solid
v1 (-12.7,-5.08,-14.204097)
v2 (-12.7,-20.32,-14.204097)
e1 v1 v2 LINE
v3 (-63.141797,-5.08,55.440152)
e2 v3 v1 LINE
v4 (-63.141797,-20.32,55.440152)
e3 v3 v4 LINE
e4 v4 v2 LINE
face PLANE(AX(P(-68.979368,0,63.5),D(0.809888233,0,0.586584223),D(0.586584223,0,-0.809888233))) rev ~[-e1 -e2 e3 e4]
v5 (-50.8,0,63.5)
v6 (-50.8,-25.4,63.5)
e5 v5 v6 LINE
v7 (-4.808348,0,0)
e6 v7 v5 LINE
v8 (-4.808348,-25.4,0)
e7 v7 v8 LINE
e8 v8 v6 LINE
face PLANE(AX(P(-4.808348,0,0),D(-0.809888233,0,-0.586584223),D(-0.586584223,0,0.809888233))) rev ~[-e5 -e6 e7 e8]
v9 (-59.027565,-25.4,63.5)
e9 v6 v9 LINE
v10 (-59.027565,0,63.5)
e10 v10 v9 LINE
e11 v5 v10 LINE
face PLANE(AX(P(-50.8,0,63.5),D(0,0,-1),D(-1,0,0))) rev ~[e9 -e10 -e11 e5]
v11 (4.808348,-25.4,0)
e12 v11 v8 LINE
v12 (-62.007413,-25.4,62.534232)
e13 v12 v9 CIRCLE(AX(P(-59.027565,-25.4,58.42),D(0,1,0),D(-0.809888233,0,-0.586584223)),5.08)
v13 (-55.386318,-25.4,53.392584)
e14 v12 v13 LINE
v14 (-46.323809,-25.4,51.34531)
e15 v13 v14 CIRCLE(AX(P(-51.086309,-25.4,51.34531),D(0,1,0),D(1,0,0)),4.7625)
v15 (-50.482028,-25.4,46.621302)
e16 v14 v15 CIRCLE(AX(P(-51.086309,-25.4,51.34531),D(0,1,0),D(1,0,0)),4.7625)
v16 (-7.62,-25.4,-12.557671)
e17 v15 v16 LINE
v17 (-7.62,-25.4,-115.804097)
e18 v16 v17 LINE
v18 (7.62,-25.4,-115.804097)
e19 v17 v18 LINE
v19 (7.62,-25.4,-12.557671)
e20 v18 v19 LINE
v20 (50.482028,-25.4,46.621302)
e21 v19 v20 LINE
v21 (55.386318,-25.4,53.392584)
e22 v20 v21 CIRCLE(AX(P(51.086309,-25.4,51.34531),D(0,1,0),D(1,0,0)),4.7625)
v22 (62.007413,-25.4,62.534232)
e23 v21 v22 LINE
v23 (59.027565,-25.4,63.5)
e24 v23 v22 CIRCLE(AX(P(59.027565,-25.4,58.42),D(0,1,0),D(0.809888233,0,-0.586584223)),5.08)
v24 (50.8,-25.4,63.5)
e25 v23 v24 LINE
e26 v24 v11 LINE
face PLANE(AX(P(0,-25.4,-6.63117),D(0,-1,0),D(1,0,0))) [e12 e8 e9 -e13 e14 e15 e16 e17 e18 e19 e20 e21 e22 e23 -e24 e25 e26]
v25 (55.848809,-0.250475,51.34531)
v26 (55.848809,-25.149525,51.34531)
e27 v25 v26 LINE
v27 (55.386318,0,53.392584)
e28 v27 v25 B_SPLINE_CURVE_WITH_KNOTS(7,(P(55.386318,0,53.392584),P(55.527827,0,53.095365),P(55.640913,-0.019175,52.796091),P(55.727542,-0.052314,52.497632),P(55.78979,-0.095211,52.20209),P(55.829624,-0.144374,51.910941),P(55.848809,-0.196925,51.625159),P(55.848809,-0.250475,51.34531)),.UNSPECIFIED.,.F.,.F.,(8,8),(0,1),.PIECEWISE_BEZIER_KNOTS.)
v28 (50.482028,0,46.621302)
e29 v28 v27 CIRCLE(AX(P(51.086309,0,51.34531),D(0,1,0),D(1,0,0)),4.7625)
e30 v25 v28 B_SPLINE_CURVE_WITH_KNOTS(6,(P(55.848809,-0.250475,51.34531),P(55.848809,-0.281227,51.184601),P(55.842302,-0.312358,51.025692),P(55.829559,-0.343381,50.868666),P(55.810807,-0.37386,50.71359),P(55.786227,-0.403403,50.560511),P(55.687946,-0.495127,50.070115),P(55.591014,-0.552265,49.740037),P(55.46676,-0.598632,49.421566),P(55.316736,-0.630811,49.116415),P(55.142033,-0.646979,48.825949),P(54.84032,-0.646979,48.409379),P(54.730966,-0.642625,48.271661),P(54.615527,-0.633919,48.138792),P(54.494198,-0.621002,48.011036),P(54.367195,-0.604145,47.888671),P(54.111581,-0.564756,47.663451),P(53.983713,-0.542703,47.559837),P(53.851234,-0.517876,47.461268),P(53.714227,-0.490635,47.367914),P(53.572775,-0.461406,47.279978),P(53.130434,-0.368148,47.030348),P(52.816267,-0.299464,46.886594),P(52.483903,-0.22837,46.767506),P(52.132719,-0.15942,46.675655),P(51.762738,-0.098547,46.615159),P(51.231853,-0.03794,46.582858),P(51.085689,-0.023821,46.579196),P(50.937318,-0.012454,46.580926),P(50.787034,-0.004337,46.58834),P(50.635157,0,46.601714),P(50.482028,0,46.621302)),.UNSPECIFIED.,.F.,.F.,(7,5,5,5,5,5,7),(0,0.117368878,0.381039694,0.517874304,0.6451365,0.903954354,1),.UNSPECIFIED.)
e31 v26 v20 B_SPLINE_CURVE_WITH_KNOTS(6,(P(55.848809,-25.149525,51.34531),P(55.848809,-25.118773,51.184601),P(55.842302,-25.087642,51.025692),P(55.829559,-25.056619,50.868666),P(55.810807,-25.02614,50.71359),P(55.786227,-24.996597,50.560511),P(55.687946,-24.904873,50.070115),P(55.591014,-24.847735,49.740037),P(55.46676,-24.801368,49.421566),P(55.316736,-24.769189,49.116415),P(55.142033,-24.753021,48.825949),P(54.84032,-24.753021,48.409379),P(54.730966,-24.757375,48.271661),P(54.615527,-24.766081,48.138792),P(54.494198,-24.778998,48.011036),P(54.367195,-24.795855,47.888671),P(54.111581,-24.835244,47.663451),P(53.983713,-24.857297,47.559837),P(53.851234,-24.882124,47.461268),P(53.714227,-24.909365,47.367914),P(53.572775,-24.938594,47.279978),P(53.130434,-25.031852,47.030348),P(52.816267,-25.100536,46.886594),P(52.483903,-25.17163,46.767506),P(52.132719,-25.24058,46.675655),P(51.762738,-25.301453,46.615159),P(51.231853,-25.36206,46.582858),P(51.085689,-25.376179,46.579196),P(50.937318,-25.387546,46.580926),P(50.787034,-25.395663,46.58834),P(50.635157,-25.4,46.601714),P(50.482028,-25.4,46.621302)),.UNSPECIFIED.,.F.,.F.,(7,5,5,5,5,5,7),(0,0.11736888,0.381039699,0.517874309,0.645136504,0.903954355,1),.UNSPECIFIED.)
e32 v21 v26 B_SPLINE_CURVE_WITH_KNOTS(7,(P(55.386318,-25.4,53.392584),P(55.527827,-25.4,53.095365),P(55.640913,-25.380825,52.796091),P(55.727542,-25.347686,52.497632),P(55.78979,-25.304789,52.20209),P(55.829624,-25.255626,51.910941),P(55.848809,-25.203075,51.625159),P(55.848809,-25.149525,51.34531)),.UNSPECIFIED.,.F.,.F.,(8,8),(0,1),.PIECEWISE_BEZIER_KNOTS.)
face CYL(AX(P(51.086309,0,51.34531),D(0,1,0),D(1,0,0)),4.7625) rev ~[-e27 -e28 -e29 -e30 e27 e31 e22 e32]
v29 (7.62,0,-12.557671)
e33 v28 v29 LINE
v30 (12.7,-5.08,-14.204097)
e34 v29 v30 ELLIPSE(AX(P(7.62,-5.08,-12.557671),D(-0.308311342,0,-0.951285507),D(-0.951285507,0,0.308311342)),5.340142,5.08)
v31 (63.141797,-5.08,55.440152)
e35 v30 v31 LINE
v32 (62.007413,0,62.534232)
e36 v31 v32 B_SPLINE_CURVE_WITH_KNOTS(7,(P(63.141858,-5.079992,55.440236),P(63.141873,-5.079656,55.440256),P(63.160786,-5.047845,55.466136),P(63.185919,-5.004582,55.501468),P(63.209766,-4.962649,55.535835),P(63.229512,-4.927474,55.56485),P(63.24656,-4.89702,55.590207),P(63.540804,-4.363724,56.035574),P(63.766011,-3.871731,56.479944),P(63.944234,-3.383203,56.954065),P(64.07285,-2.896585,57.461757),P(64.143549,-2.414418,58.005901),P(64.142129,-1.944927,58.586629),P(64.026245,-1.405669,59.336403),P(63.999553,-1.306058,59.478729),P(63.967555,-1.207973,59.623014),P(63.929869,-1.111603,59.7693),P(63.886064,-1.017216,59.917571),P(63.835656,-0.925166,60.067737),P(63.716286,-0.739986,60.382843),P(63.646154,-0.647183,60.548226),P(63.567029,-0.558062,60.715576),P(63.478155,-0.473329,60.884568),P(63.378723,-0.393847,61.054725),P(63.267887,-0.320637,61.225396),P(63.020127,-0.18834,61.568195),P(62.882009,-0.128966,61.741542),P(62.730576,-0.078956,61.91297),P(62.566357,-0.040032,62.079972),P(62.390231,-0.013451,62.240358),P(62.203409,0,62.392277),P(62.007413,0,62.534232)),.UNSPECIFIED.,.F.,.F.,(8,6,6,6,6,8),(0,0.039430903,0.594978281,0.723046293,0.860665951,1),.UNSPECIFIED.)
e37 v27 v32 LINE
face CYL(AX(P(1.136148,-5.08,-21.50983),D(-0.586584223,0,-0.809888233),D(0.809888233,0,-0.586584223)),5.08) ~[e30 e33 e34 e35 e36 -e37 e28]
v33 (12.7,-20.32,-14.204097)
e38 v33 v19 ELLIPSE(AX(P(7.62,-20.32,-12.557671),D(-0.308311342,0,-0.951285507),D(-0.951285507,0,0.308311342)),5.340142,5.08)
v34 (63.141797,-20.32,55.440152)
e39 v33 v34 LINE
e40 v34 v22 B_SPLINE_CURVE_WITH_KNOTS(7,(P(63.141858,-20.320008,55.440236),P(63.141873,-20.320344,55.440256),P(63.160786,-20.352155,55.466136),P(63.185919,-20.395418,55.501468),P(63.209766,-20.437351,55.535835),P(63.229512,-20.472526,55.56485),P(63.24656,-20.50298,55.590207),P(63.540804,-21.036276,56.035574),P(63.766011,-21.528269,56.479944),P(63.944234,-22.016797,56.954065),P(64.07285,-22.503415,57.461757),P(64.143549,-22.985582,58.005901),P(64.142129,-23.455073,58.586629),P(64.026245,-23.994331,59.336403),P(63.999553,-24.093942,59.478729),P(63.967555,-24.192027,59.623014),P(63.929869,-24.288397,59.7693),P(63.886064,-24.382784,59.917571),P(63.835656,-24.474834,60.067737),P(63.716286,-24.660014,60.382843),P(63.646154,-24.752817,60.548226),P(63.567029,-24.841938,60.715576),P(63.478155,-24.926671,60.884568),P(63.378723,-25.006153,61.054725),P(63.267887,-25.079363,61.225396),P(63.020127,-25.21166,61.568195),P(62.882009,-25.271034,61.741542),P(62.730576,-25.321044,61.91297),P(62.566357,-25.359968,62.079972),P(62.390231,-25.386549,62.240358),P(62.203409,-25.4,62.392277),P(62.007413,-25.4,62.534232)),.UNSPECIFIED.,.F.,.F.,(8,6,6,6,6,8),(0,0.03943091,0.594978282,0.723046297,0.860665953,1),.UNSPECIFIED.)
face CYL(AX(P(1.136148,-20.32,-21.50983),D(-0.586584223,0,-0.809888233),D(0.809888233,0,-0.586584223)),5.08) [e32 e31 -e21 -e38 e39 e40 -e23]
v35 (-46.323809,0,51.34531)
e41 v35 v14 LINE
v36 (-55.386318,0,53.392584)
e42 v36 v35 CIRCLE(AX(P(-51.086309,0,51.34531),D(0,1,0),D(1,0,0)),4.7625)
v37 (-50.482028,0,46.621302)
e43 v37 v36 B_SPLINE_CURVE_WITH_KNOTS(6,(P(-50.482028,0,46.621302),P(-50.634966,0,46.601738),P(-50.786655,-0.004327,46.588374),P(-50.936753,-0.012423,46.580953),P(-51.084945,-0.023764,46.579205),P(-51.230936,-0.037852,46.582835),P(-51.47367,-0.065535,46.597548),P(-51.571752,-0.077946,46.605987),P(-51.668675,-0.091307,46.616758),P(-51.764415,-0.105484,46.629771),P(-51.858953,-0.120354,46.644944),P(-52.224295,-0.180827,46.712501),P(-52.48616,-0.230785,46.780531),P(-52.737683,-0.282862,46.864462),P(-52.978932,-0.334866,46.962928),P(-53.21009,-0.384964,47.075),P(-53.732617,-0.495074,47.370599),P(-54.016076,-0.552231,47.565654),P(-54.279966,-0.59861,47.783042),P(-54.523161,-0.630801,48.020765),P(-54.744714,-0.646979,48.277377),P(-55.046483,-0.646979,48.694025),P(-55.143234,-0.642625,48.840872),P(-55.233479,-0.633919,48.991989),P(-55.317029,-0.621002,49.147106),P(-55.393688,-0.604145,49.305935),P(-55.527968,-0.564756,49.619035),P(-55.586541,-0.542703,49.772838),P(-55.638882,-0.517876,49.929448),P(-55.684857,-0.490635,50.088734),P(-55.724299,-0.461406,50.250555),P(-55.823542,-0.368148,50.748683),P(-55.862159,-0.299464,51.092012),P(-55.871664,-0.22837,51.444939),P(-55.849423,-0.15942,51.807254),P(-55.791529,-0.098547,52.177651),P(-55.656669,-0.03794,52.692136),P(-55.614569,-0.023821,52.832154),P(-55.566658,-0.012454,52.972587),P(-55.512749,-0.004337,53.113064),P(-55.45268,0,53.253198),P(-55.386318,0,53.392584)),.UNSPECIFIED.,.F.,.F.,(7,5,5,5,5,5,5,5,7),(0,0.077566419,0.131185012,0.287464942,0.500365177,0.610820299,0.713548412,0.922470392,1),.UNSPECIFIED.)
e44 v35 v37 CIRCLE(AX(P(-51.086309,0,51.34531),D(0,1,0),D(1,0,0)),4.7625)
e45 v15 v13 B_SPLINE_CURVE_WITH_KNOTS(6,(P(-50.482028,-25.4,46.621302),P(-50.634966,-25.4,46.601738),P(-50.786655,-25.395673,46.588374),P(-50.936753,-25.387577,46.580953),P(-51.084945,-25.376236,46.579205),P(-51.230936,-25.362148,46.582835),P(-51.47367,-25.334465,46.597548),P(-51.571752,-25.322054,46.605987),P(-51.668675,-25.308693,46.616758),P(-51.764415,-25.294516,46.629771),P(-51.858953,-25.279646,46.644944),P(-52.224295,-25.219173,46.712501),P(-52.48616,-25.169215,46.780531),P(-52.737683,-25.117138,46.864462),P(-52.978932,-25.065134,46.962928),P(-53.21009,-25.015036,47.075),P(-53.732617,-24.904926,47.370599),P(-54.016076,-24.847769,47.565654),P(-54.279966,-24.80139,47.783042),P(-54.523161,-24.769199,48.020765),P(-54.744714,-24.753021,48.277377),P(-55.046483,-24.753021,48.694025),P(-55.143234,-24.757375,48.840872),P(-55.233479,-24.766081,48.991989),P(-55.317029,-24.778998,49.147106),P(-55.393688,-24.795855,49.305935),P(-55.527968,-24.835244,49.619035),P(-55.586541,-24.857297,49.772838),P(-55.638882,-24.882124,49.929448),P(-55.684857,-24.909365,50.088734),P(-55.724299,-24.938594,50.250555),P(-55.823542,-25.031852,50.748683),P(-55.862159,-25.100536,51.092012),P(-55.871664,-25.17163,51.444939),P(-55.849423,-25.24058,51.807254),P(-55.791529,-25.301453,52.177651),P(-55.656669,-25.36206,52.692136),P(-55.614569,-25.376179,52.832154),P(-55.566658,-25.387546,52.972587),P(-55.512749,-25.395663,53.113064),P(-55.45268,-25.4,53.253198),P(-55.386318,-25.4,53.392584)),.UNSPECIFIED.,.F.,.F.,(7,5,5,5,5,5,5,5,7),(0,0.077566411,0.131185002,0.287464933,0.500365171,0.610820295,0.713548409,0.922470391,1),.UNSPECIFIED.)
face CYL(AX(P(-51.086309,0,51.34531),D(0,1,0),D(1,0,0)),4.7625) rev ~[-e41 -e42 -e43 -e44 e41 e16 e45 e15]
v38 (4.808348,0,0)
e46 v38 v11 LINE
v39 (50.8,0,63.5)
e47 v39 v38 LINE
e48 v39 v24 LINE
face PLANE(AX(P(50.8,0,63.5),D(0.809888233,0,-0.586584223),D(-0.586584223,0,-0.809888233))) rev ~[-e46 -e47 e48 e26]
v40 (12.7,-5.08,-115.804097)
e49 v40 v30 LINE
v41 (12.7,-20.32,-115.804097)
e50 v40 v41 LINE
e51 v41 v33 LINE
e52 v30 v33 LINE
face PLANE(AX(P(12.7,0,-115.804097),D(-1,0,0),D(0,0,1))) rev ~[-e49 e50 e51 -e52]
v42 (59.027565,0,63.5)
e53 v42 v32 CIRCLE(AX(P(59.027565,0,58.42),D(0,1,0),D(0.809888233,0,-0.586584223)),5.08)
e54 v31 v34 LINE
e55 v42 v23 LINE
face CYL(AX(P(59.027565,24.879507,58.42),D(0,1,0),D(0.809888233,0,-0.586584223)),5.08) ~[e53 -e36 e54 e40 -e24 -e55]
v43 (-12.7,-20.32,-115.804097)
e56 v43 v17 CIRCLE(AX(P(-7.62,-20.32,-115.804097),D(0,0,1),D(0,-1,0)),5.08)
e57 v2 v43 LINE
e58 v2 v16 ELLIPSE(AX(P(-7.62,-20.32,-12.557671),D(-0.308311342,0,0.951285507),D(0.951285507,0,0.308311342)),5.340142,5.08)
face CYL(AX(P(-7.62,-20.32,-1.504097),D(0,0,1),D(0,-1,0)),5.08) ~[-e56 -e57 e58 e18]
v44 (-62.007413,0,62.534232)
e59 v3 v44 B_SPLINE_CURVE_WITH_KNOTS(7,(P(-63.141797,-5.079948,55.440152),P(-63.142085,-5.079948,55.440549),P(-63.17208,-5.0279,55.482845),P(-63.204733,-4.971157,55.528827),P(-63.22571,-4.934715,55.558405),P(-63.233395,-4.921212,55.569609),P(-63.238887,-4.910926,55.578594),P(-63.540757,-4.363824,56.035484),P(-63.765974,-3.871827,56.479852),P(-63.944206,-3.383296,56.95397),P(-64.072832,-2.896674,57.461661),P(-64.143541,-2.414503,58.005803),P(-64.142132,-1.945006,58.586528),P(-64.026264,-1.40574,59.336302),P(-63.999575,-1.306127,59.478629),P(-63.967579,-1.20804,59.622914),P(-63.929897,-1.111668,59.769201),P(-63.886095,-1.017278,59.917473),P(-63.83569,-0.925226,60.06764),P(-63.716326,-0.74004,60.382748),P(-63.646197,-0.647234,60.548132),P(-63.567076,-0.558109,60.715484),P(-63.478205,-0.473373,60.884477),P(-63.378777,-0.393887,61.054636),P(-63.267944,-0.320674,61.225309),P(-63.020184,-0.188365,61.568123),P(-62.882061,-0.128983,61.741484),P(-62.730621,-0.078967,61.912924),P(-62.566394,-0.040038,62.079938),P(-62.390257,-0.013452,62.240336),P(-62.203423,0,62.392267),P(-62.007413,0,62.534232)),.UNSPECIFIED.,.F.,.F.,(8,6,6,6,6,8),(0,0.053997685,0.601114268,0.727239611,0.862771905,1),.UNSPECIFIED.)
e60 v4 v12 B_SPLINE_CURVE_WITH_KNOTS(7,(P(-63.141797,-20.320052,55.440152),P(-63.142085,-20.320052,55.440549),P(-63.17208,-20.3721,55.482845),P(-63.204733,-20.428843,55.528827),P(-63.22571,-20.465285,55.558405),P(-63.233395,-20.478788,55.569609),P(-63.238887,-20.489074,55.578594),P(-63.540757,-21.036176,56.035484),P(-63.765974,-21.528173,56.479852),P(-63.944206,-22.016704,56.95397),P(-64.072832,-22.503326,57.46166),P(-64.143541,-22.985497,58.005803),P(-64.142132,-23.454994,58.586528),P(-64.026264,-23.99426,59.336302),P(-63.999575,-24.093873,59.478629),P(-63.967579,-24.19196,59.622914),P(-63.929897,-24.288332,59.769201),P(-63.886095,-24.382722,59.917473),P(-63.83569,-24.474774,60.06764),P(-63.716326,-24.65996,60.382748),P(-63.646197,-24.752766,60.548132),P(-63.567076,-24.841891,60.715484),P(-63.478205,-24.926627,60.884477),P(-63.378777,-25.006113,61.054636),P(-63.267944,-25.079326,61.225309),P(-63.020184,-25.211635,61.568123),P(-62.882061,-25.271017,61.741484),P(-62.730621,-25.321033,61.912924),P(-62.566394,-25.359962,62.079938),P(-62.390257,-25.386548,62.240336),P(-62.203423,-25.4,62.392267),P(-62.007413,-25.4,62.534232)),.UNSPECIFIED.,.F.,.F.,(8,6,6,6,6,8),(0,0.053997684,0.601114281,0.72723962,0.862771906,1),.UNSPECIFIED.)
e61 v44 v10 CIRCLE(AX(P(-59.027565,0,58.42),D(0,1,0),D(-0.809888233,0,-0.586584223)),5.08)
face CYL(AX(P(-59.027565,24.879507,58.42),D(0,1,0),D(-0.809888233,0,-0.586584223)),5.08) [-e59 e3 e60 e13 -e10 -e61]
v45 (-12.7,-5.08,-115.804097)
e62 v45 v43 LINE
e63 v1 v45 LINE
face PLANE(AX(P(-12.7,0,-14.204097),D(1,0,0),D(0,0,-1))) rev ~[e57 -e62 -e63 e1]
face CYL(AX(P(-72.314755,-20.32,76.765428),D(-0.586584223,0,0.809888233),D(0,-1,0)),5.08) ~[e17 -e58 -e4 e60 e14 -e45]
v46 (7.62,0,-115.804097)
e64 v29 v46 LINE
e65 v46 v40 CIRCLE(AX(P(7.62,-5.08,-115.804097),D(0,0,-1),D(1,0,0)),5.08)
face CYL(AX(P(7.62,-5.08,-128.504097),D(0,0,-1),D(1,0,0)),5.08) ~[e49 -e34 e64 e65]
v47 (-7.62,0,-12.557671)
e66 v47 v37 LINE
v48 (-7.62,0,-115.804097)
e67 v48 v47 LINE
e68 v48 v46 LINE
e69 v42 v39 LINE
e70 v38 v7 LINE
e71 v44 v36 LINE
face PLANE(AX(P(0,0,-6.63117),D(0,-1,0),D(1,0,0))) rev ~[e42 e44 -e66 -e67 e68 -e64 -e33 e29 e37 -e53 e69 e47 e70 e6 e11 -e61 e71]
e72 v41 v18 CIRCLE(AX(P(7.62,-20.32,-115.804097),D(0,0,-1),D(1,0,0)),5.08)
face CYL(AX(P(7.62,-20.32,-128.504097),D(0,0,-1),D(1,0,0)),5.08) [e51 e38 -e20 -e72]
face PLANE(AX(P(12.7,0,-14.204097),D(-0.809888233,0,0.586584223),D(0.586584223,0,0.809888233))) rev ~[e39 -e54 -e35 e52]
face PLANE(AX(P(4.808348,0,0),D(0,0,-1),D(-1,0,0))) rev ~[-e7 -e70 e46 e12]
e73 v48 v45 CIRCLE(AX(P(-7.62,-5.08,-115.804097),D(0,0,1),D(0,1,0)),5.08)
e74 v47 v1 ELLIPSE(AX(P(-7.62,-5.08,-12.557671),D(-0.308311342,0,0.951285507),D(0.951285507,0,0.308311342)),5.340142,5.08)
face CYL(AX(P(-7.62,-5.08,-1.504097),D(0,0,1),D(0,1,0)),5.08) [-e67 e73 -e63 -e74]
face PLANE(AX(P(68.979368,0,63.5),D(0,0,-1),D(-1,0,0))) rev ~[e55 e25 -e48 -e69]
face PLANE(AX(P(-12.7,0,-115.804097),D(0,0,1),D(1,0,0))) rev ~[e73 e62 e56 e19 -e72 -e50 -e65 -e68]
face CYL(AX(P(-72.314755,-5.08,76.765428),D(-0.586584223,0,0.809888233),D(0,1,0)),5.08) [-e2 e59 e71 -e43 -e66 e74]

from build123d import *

# Parameters (mm, degrees)
F1_DEPTH     = 25.4
F3_DEPTH     = 25.401
F4_T1_DEPTH  = 75.1590131963
F4_T6_DEPTH  = 127
F4_T11_DEPTH = 127
F4_T16_DEPTH = 127
F4_T21_DEPTH = 127
F4_T26_DEPTH = 121.344223221
F4_T31_DEPTH = 121.344223221
F4_T36_DEPTH = 121.344223221
F4_T41_DEPTH = 121.344223221
F4_T47_DEPTH = 121.344223221
F4_T51_DEPTH = 127
F4_T58_DEPTH = 127
F4_T62_DEPTH = 121.344223221
F4_T69_DEPTH = 121.344223221
F4_T73_DEPTH = 127
F4_T80_DEPTH = 127
F4_T84_DEPTH = 121.344223221


# Not quite as in the source:
# - a fillet or chamfer that OpenCascade refuses, or shapes differently, is made with other operations: its cross-section is extruded or revolved along the edge and cut away or added


with BuildPart() as f1:
    # F0 (on Front) → F1 (new body)
    with BuildSketch(Plane.XZ):
        Polygon((4.8083475167, 0), (0, 0), (-4.8083475167, 0), (-50.8, 63.5), (-68.9793676138, 63.5), (-12.7, -14.2040973853), (-12.7, -115.8040973853), (0, -115.8040973853), (12.7, -115.8040973853), (12.7, -14.2040973853), (68.9793676138, 63.5), (50.8, 63.5), align=None)
    extrude(amount=F1_DEPTH)

    # F2 (on face) → F3 (cut, through all)
    with BuildSketch(Plane(origin=(0, 0, 0), x_dir=(-1, 0, 0), z_dir=(0, 1, 0))):
        with BuildLine():
            ThreePointArc((-46.3238090676, 51.3453096211), (-51.0863090676, 56.1078096211), (-55.8488090676, 51.3453096211))
            Line((-55.8488090676, 51.3453096211), (-46.3238090676, 51.3453096211))
        make_face()
        with BuildLine():
            Line((-46.3238090676, 51.3453096211), (-55.8488090676, 51.3453096211))
            ThreePointArc((-55.8488090676, 51.3453096211), (-51.0863090676, 46.5828096211), (-46.3238090676, 51.3453096211))
        make_face()
        with BuildLine():
            ThreePointArc((55.8488090676, 51.3453096211), (51.0863090676, 56.1078096211), (46.3238090676, 51.3453096211))
            Line((46.3238090676, 51.3453096211), (55.8488090676, 51.3453096211))
        make_face()
        with BuildLine():
            Line((55.8488090676, 51.3453096211), (46.3238090676, 51.3453096211))
            ThreePointArc((46.3238090676, 51.3453096211), (51.0863090676, 46.5828096211), (55.8488090676, 51.3453096211))
        make_face()
    extrude(amount=-F3_DEPTH, mode=Mode.SUBTRACT)

    # F4: fillet of radius 5.08 on 10 edges, made by hand

    # F4_s2 → F4_t1 (cut)
    with BuildSketch(Plane.XZ.offset(-24.8795065982)):
        with BuildLine():
            ThreePointArc((-63.1417971968, 55.440152148), (-63.552165901, 60.7296290732), (-59.0275649745, 63.5))
            Line((-59.0275649745, 63.5), (-68.9793676138, 63.5))
            Line((-68.9793676138, 63.5), (-63.1417971968, 55.440152148))
        make_face()
        with BuildLine():
            ThreePointArc((63.1417971968, 55.440152148), (63.552165901, 60.7296290732), (59.0275649745, 63.5))
            Line((59.0275649745, 63.5), (68.9793676138, 63.5))
            Line((68.9793676138, 63.5), (63.1417971968, 55.440152148))
        make_face()
    extrude(amount=F4_T1_DEPTH, mode=Mode.SUBTRACT)


with BuildPart() as f4_tool4:
    # F4_s5 → F4_t6 (new body)
    with BuildSketch(Plane.XY.offset(-128.5040973853)):
        with BuildLine():
            ThreePointArc((12.7, -5.08), (11.2121024484, -1.4878975516), (7.62, 0))
            Line((7.62, 0), (12.7, 0))
            Line((12.7, 0), (12.7, -5.08))
        make_face()
    extrude(amount=F4_T6_DEPTH)

    split(bisect_by=Plane(origin=(15.0780779602, 0, -10.9207200262), x_dir=(0, 1, 0), z_dir=(0.8098882327, 0, -0.5865842228)), keep=Keep.TOP)


with BuildPart() as f1_1:
    add(f1.part)

    # F4_t3: cut F4_tool4
    add(f4_tool4.part, mode=Mode.SUBTRACT)


with BuildPart() as f4_tool9:
    # F4_s10 → F4_t11 (new body)
    with BuildSketch(Plane.XY.offset(-1.5040973853)):
        with BuildLine():
            ThreePointArc((-7.62, 0), (-11.2121024484, -1.4878975516), (-12.7, -5.08))
            Line((-12.7, -5.08), (-12.7, 0))
            Line((-12.7, 0), (-7.62, 0))
        make_face()
    extrude(amount=-F4_T11_DEPTH)

    split(bisect_by=Plane(origin=(-15.0780779602, 0, -10.9207200262), x_dir=(0, 1, 0), z_dir=(-0.8098882327, 0, -0.5865842228)), keep=Keep.TOP)


with BuildPart() as f1_2:
    add(f1_1.part)

    # F4_t8: cut F4_tool9
    add(f4_tool9.part, mode=Mode.SUBTRACT)


with BuildPart() as f4_tool14:
    # F4_s15 → F4_t16 (new body)
    with BuildSketch(Plane.XY.offset(-128.5040973853)):
        with BuildLine():
            ThreePointArc((12.7, -20.32), (11.2121024484, -23.9121024484), (7.62, -25.4))
            Line((7.62, -25.4), (12.7, -25.4))
            Line((12.7, -25.4), (12.7, -20.32))
        make_face()
    extrude(amount=F4_T16_DEPTH)

    split(bisect_by=Plane(origin=(15.0780779602, 0, -10.9207200262), x_dir=(0, 1, 0), z_dir=(0.8098882327, 0, -0.5865842228)), keep=Keep.TOP)


with BuildPart() as f1_3:
    add(f1_2.part)

    # F4_t13: cut F4_tool14
    add(f4_tool14.part, mode=Mode.SUBTRACT)


with BuildPart() as f4_tool19:
    # F4_s20 → F4_t21 (new body)
    with BuildSketch(Plane.XY.offset(-1.5040973853)):
        with BuildLine():
            ThreePointArc((-7.62, -25.4), (-11.2121024484, -23.9121024484), (-12.7, -20.32))
            Line((-12.7, -20.32), (-12.7, -25.4))
            Line((-12.7, -25.4), (-7.62, -25.4))
        make_face()
    extrude(amount=-F4_T21_DEPTH)

    split(bisect_by=Plane(origin=(-15.0780779602, 0, -10.9207200262), x_dir=(0, 1, 0), z_dir=(-0.8098882327, 0, -0.5865842228)), keep=Keep.TOP)


with BuildPart() as f1_4:
    add(f1_3.part)

    # F4_t18: cut F4_tool19
    add(f4_tool19.part, mode=Mode.SUBTRACT)


with BuildPart() as f4_tool24:
    # F4_s25 → F4_t26 (new body)
    with BuildSketch(Plane(origin=(-9.8276975902, 0, -13.5689579148), x_dir=(0, 1, 0), z_dir=(0.5865842228, 0, 0.8098882327))):
        with BuildLine():
            ThreePointArc((-20.32, -18.6174799816), (-23.9121024484, -17.12958243), (-25.4, -13.5374799816))
            Line((-25.4, -13.5374799816), (-25.4, -18.6174799816))
            Line((-25.4, -18.6174799816), (-20.32, -18.6174799816))
        make_face()
    extrude(amount=F4_T26_DEPTH)

    split(bisect_by=Plane.YZ.offset(12.7), keep=Keep.TOP)


with BuildPart() as f1_5:
    add(f1_4.part)

    # F4_t23: cut F4_tool24
    add(f4_tool24.part, mode=Mode.SUBTRACT)


with BuildPart() as f4_tool29:
    # F4_s30 → F4_t31 (new body)
    with BuildSketch(Plane(origin=(-9.8276975902, 0, -13.5689579148), x_dir=(0, 1, 0), z_dir=(0.5865842228, 0, 0.8098882327))):
        with BuildLine():
            ThreePointArc((-5.08, -18.6174799816), (-1.4878975516, -17.12958243), (0, -13.5374799816))
            Line((0, -13.5374799816), (0, -18.6174799816))
            Line((0, -18.6174799816), (-5.08, -18.6174799816))
        make_face()
    extrude(amount=F4_T31_DEPTH)

    split(bisect_by=Plane.YZ.offset(12.7), keep=Keep.TOP)


with BuildPart() as f1_6:
    add(f1_5.part)

    # F4_t28: cut F4_tool29
    add(f4_tool29.part, mode=Mode.SUBTRACT)


with BuildPart() as f4_tool34:
    # F4_s35 → F4_t36 (new body)
    with BuildSketch(Plane(origin=(-61.3509092836, 0, 84.7063005819), x_dir=(0, 1, 0), z_dir=(0.5865842228, 0, -0.8098882327))):
        with BuildLine():
            ThreePointArc((-25.4, -13.5374799816), (-23.9121024484, -17.12958243), (-20.32, -18.6174799816))
            Line((-20.32, -18.6174799816), (-25.4, -18.6174799816))
            Line((-25.4, -18.6174799816), (-25.4, -13.5374799816))
        make_face()
    extrude(amount=F4_T36_DEPTH)

    split(bisect_by=Plane.YZ.offset(-12.7), keep=Keep.BOTTOM)


with BuildPart() as f1_7:
    add(f1_6.part)

    # F4_t33: cut F4_tool34
    add(f4_tool34.part, mode=Mode.SUBTRACT)


with BuildPart() as f4_tool39:
    # F4_s40 → F4_t41 (new body)
    with BuildSketch(Plane(origin=(-61.3509092836, 0, 84.7063005819), x_dir=(0, 1, 0), z_dir=(0.5865842228, 0, -0.8098882327))):
        with BuildLine():
            ThreePointArc((0, -13.5374799816), (-1.4878975516, -17.12958243), (-5.08, -18.6174799816))
            Line((-5.08, -18.6174799816), (0, -18.6174799816))
            Line((0, -18.6174799816), (0, -13.5374799816))
        make_face()
    extrude(amount=F4_T41_DEPTH)

    split(bisect_by=Plane.YZ.offset(-12.7), keep=Keep.BOTTOM)


with BuildPart() as f1_8:
    add(f1_7.part)

    # F4_t38: cut F4_tool39
    add(f4_tool39.part, mode=Mode.SUBTRACT)


with BuildPart() as f4_tool45:
    # F4_s46 → F4_t47 (new body)
    with BuildSketch(Plane(origin=(-9.8276975902, 0, -13.5689579148), x_dir=(0, 1, 0), z_dir=(0.5865842228, 0, 0.8098882327))):
        with BuildLine():
            ThreePointArc((-5.08, -18.6174799816), (-1.4878975516, -17.12958243), (0, -13.5374799816))
            Line((0, -13.5374799816), (0, -18.6174799816))
            Line((0, -18.6174799816), (-5.08, -18.6174799816))
        make_face()
    extrude(amount=F4_T47_DEPTH)

    split(bisect_by=Plane.YZ.offset(12.7), keep=Keep.BOTTOM)


with BuildPart() as f4_tool49:
    # F4_s50 → F4_t51 (new body)
    with BuildSketch(Plane.XY.offset(-128.5040973853)):
        with BuildLine():
            ThreePointArc((12.7, -5.08), (11.2121024484, -1.4878975516), (7.62, 0))
            Line((7.62, 0), (12.7, 0))
            Line((12.7, 0), (12.7, -5.08))
        make_face()
    extrude(amount=F4_T51_DEPTH)

    split(bisect_by=Plane(origin=(15.0780779602, 0, -10.9207200262), x_dir=(0, 1, 0), z_dir=(-0.8098882327, 0, 0.5865842228)), keep=Keep.TOP)


with BuildPart() as f4_tool45_1:
    add(f4_tool45.part)

    # F4_t53: intersect F4_tool49
    add(f4_tool49.part, mode=Mode.INTERSECT)


with BuildPart() as f1_9:
    add(f1_8.part)

    # F4_t43: cut F4_tool45
    add(f4_tool45_1.part, mode=Mode.SUBTRACT)


with BuildPart() as f4_tool56:
    # F4_s57 → F4_t58 (new body)
    with BuildSketch(Plane.XY.offset(-1.5040973853)):
        with BuildLine():
            ThreePointArc((-7.62, 0), (-11.2121024484, -1.4878975516), (-12.7, -5.08))
            Line((-12.7, -5.08), (-12.7, 0))
            Line((-12.7, 0), (-7.62, 0))
        make_face()
    extrude(amount=-F4_T58_DEPTH)

    split(bisect_by=Plane(origin=(-15.0780779602, 0, -10.9207200262), x_dir=(0, 1, 0), z_dir=(0.8098882327, 0, 0.5865842228)), keep=Keep.TOP)


with BuildPart() as f4_tool60:
    # F4_s61 → F4_t62 (new body)
    with BuildSketch(Plane(origin=(-61.3509092836, 0, 84.7063005819), x_dir=(0, 1, 0), z_dir=(0.5865842228, 0, -0.8098882327))):
        with BuildLine():
            ThreePointArc((0, -13.5374799816), (-1.4878975516, -17.12958243), (-5.08, -18.6174799816))
            Line((-5.08, -18.6174799816), (0, -18.6174799816))
            Line((0, -18.6174799816), (0, -13.5374799816))
        make_face()
    extrude(amount=F4_T62_DEPTH)

    split(bisect_by=Plane.YZ.offset(-12.7), keep=Keep.TOP)


with BuildPart() as f4_tool56_1:
    add(f4_tool56.part)

    # F4_t64: intersect F4_tool60
    add(f4_tool60.part, mode=Mode.INTERSECT)


with BuildPart() as f1_10:
    add(f1_9.part)

    # F4_t54: cut F4_tool56
    add(f4_tool56_1.part, mode=Mode.SUBTRACT)


with BuildPart() as f4_tool67:
    # F4_s68 → F4_t69 (new body)
    with BuildSketch(Plane(origin=(-9.8276975902, 0, -13.5689579148), x_dir=(0, 1, 0), z_dir=(0.5865842228, 0, 0.8098882327))):
        with BuildLine():
            ThreePointArc((-20.32, -18.6174799816), (-23.9121024484, -17.12958243), (-25.4, -13.5374799816))
            Line((-25.4, -13.5374799816), (-25.4, -18.6174799816))
            Line((-25.4, -18.6174799816), (-20.32, -18.6174799816))
        make_face()
    extrude(amount=F4_T69_DEPTH)

    split(bisect_by=Plane.YZ.offset(12.7), keep=Keep.BOTTOM)


with BuildPart() as f4_tool71:
    # F4_s72 → F4_t73 (new body)
    with BuildSketch(Plane.XY.offset(-128.5040973853)):
        with BuildLine():
            ThreePointArc((12.7, -20.32), (11.2121024484, -23.9121024484), (7.62, -25.4))
            Line((7.62, -25.4), (12.7, -25.4))
            Line((12.7, -25.4), (12.7, -20.32))
        make_face()
    extrude(amount=F4_T73_DEPTH)

    split(bisect_by=Plane(origin=(15.0780779602, 0, -10.9207200262), x_dir=(0, 1, 0), z_dir=(-0.8098882327, 0, 0.5865842228)), keep=Keep.TOP)


with BuildPart() as f4_tool67_1:
    add(f4_tool67.part)

    # F4_t75: intersect F4_tool71
    add(f4_tool71.part, mode=Mode.INTERSECT)


with BuildPart() as f1_11:
    add(f1_10.part)

    # F4_t65: cut F4_tool67
    add(f4_tool67_1.part, mode=Mode.SUBTRACT)


with BuildPart() as f4_tool78:
    # F4_s79 → F4_t80 (new body)
    with BuildSketch(Plane.XY.offset(-1.5040973853)):
        with BuildLine():
            ThreePointArc((-7.62, -25.4), (-11.2121024484, -23.9121024484), (-12.7, -20.32))
            Line((-12.7, -20.32), (-12.7, -25.4))
            Line((-12.7, -25.4), (-7.62, -25.4))
        make_face()
    extrude(amount=-F4_T80_DEPTH)

    split(bisect_by=Plane(origin=(-15.0780779602, 0, -10.9207200262), x_dir=(0, 1, 0), z_dir=(0.8098882327, 0, 0.5865842228)), keep=Keep.TOP)


with BuildPart() as f4_tool82:
    # F4_s83 → F4_t84 (new body)
    with BuildSketch(Plane(origin=(-61.3509092836, 0, 84.7063005819), x_dir=(0, 1, 0), z_dir=(0.5865842228, 0, -0.8098882327))):
        with BuildLine():
            ThreePointArc((-25.4, -13.5374799816), (-23.9121024484, -17.12958243), (-20.32, -18.6174799816))
            Line((-20.32, -18.6174799816), (-25.4, -18.6174799816))
            Line((-25.4, -18.6174799816), (-25.4, -13.5374799816))
        make_face()
    extrude(amount=F4_T84_DEPTH)

    split(bisect_by=Plane.YZ.offset(-12.7), keep=Keep.TOP)


with BuildPart() as f4_tool78_1:
    add(f4_tool78.part)

    # F4_t86: intersect F4_tool82
    add(f4_tool82.part, mode=Mode.INTERSECT)


with BuildPart() as f1_12:
    add(f1_11.part)

    # F4_t76: cut F4_tool78
    add(f4_tool78_1.part, mode=Mode.SUBTRACT)


solid = f1_12.part
